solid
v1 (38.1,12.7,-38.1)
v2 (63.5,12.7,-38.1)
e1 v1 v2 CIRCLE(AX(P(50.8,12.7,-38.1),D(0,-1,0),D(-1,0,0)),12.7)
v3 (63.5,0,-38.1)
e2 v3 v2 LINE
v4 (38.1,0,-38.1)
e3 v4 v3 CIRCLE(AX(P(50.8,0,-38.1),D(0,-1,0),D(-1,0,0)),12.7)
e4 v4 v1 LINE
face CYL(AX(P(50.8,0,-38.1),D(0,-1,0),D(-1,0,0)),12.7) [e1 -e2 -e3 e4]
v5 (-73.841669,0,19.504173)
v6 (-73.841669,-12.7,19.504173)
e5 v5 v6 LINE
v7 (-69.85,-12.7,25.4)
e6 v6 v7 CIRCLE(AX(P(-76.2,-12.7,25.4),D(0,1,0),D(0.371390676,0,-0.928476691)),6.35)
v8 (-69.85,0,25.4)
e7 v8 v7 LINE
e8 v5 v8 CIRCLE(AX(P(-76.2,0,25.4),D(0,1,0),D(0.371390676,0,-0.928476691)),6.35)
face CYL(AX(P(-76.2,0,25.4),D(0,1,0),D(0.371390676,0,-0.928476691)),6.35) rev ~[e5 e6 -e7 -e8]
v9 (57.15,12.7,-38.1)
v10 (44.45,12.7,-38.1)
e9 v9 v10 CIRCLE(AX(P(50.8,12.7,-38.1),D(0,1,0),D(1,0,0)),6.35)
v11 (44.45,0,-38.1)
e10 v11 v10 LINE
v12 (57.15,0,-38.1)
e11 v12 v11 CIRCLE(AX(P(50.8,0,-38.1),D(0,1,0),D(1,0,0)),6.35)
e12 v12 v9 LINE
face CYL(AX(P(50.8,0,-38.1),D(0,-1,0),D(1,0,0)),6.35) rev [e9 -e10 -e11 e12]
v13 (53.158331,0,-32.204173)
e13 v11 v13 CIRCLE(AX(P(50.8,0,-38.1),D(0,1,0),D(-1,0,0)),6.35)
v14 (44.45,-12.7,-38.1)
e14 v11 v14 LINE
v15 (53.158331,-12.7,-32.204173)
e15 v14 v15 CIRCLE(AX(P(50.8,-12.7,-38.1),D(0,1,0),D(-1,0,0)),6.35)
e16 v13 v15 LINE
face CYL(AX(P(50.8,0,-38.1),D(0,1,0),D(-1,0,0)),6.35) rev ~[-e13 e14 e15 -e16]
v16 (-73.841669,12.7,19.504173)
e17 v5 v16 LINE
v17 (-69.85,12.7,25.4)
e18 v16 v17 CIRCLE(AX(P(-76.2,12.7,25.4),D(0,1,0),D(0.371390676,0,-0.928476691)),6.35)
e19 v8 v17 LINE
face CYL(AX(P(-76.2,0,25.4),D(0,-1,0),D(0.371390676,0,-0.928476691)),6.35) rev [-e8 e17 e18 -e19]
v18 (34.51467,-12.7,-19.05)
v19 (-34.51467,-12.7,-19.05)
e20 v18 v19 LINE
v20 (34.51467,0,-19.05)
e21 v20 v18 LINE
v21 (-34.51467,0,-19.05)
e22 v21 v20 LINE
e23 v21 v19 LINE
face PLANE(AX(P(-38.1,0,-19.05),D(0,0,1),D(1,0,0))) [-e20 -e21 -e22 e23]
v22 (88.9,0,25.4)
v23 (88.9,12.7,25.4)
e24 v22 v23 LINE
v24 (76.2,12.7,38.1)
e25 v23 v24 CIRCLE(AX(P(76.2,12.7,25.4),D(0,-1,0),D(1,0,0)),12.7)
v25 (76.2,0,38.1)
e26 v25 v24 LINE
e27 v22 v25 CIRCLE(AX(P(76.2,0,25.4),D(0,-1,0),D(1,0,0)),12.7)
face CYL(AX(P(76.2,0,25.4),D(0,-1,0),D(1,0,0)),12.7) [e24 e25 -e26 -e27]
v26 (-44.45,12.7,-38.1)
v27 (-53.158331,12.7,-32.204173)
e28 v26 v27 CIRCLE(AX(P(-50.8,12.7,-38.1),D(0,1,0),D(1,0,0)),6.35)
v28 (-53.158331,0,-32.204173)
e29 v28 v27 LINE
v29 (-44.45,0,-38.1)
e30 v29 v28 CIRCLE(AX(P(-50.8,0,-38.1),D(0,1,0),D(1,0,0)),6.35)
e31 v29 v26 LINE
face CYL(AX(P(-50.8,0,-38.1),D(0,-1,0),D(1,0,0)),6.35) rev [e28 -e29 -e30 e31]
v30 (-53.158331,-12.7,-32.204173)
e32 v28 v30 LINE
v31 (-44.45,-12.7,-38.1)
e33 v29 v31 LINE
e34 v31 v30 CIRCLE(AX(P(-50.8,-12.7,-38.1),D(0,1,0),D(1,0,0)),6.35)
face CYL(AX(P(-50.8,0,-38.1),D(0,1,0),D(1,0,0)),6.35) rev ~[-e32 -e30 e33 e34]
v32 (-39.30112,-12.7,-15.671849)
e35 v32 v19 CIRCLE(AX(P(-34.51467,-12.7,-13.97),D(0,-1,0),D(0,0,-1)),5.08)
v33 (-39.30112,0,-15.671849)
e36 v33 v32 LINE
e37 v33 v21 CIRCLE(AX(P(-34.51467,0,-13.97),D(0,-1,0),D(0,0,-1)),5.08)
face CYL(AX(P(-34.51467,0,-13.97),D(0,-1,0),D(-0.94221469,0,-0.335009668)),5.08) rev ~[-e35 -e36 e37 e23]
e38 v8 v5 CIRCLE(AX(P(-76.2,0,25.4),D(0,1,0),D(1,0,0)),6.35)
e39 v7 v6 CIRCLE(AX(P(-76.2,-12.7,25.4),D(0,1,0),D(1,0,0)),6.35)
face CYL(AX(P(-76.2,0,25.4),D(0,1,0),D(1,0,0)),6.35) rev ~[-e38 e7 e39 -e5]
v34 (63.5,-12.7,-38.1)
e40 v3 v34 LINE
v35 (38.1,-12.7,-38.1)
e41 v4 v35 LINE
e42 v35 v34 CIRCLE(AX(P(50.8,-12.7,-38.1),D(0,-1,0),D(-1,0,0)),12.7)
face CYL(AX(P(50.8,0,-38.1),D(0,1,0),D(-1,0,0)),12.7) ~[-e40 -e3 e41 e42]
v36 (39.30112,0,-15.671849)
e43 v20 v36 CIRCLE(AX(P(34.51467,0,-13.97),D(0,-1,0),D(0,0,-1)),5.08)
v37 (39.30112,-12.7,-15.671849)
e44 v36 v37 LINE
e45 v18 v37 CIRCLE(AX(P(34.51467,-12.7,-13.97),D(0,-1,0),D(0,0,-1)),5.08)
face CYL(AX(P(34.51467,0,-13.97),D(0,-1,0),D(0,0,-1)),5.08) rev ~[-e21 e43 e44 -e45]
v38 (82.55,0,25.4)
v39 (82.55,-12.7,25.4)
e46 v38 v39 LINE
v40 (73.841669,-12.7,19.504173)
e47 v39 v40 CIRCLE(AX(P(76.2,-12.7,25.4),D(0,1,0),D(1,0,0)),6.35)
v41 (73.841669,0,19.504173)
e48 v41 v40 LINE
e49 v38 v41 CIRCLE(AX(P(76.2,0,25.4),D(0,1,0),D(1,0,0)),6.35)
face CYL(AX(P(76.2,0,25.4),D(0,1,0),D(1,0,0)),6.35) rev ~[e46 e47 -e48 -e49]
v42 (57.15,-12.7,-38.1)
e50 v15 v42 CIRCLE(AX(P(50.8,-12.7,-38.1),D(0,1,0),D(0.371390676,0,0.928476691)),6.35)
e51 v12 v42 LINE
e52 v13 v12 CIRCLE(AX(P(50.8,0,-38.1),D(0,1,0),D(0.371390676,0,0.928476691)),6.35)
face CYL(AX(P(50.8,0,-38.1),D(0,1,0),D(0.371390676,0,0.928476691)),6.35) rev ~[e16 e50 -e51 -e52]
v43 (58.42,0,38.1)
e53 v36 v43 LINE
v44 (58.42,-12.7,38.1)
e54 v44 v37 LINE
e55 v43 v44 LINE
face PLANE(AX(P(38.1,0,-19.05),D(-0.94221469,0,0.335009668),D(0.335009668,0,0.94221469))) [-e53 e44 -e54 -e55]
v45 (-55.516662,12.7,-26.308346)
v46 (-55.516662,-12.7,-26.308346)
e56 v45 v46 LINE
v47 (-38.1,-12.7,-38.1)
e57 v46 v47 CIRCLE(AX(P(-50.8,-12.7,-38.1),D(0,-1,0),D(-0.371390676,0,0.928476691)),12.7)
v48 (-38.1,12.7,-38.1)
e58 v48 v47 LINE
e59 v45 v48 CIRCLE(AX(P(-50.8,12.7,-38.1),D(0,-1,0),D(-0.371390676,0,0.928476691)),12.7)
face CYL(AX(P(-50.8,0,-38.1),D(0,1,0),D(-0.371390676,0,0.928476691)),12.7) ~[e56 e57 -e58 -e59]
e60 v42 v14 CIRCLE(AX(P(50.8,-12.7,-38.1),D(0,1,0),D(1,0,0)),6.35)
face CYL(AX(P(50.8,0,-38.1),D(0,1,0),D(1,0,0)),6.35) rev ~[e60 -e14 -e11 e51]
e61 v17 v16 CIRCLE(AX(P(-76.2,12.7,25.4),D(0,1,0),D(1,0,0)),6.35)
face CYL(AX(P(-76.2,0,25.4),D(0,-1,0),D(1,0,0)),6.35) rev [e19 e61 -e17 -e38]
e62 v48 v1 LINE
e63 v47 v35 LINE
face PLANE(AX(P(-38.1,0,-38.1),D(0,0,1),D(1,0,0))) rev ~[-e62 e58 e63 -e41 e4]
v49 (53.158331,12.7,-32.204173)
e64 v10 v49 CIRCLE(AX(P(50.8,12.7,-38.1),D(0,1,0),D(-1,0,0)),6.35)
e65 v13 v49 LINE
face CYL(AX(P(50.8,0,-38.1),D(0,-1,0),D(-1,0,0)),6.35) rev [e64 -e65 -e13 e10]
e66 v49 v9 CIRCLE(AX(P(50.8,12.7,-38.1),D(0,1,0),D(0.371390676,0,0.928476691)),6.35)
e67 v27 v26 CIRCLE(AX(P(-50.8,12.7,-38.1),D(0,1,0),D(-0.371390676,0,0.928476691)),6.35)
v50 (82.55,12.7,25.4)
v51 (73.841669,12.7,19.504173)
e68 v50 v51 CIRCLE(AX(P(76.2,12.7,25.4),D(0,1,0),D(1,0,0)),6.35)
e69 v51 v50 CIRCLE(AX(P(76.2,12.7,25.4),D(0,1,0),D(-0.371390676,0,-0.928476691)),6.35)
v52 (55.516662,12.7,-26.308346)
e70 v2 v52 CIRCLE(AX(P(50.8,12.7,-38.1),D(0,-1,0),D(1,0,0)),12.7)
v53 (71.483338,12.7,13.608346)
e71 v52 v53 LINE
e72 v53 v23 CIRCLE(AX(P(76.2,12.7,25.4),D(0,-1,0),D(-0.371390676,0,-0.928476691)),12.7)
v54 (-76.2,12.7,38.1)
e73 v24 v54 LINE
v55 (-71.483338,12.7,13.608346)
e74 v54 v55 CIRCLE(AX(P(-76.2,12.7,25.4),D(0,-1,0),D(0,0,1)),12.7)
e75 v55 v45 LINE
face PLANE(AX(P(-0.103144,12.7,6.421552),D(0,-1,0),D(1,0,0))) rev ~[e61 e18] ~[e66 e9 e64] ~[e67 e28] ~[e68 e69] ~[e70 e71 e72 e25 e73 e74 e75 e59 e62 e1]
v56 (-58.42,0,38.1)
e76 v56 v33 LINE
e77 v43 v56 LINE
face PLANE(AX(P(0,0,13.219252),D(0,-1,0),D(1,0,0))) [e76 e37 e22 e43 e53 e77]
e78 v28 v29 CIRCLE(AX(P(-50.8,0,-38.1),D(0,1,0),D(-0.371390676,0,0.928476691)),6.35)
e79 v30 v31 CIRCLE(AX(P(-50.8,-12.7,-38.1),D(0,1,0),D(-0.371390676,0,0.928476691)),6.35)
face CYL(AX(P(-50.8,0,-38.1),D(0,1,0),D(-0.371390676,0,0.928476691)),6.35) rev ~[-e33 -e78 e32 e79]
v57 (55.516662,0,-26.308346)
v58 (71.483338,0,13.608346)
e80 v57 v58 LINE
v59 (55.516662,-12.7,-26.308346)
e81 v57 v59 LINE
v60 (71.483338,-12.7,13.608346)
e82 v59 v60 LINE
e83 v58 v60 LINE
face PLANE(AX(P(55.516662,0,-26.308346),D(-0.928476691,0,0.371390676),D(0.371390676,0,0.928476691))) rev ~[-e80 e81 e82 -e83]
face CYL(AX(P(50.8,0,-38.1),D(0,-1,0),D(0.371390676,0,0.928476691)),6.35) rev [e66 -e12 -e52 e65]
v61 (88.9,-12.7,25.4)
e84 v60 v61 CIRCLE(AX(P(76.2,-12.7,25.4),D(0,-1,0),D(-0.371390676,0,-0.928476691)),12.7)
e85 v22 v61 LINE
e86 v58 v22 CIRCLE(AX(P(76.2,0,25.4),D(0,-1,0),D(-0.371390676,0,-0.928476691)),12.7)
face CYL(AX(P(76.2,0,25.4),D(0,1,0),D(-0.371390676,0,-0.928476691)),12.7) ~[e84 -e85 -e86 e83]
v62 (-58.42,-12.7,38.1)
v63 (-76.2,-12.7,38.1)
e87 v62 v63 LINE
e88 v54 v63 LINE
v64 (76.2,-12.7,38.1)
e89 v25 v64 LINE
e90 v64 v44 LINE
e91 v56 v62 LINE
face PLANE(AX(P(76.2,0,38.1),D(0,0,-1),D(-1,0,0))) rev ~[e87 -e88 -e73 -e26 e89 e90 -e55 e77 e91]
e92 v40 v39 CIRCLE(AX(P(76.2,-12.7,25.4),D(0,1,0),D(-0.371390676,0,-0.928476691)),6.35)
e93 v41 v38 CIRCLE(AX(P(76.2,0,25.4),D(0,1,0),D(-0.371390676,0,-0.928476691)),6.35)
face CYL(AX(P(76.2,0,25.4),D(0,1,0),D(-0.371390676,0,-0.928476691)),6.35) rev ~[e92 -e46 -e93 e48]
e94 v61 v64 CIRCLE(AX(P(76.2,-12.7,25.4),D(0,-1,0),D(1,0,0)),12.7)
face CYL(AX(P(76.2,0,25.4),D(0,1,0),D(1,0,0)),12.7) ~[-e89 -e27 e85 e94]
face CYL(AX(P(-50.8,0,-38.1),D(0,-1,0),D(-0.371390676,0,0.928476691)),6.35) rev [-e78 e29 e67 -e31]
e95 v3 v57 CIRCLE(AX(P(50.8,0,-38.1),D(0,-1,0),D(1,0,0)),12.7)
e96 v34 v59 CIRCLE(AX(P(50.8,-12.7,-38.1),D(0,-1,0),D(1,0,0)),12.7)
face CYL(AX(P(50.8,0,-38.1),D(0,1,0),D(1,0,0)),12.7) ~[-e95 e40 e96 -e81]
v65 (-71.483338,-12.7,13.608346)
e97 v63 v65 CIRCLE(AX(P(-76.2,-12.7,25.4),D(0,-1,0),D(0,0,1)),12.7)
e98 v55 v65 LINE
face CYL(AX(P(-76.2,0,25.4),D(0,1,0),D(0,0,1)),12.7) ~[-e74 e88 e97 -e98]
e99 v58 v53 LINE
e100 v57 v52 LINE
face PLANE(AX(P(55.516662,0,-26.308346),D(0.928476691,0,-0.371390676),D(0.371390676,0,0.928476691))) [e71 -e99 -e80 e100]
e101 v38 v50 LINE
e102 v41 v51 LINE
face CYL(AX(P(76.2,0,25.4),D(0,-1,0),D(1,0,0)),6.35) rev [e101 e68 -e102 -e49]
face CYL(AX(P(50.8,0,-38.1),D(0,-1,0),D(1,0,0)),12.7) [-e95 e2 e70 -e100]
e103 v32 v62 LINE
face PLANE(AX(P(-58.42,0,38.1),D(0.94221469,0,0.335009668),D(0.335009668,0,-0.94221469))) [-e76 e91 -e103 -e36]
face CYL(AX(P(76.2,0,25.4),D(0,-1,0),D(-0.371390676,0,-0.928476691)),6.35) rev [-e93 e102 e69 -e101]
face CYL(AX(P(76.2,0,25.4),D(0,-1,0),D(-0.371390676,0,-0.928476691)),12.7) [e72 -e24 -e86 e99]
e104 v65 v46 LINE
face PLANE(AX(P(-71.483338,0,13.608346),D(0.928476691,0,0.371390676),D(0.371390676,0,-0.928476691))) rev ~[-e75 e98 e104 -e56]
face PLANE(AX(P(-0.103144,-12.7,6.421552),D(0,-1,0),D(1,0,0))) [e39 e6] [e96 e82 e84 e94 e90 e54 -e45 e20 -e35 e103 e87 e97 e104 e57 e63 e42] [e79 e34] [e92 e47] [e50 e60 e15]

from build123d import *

# Parameters (mm, degrees)
F1_DEPTH = 12.7
F3_DEPTH = 38.1
F4_R     = 5.08


# Not quite as in the source:
# - a feature of the source that left no trace in its solid (it failed there, or was rolled back) is left out


with BuildPart() as f1:
    # F0 (on Front) → F1 (new body, symmetric)
    with BuildSketch(Plane.XZ):
        with BuildLine():
            Line((-38.1, -38.1), (0, -38.1))
            Line((0, -38.1), (38.1, -38.1))
            ThreePointArc((38.1, -38.1), (43.6800141218, -27.583546173), (55.5166615897, -26.3083460258))
            Line((55.5166615897, -26.3083460258), (71.4833384103, 13.6083460258))
            ThreePointArc((71.4833384103, 13.6083460258), (63.7291538885, 27.8016655187), (76.2, 38.1))
            Line((76.2, 38.1), (0, 38.1))
            Line((0, 38.1), (-76.2, 38.1))
            ThreePointArc((-76.2, 38.1), (-67.2197438789, 34.3802561211), (-63.5, 25.4))
            ThreePointArc((-63.5, 25.4), (-65.683546173, 18.2800141218), (-71.4833384103, 13.6083460258))
            Line((-71.4833384103, 13.6083460258), (-55.5166615897, -26.3083460258))
            ThreePointArc((-55.5166615897, -26.3083460258), (-43.6800141218, -27.583546173), (-38.1, -38.1))
        make_face()
        with BuildLine():
            ThreePointArc((55.5166615897, -26.3083460258), (43.6800141218, -27.583546173), (38.1, -38.1))
            Line((38.1, -38.1), (44.45, -38.1))
            ThreePointArc((44.45, -38.1), (47.2400070609, -32.8417730865), (53.1583307948, -32.2041730129))
            Line((53.1583307948, -32.2041730129), (55.5166615897, -26.3083460258))
        make_face()
        with BuildLine():
            Line((-44.45, -38.1), (-38.1, -38.1))
            ThreePointArc((-38.1, -38.1), (-43.6800141218, -27.583546173), (-55.5166615897, -26.3083460258))
            Line((-55.5166615897, -26.3083460258), (-53.1583307948, -32.2041730129))
            ThreePointArc((-53.1583307948, -32.2041730129), (-47.2400070609, -32.8417730865), (-44.45, -38.1))
        make_face()
        with BuildLine():
            ThreePointArc((-76.2, 38.1), (-88.6708461115, 22.9983344813), (-71.4833384103, 13.6083460258))
            ThreePointArc((-71.4833384103, 13.6083460258), (-65.683546173, 18.2800141218), (-63.5, 25.4))
            ThreePointArc((-63.5, 25.4), (-67.2197438789, 34.3802561211), (-76.2, 38.1))
        make_face()
        with BuildLine():
            ThreePointArc((-69.85, 25.4), (-70.9417730865, 21.8400070609), (-73.8416692052, 19.5041730129))
            ThreePointArc((-73.8416692052, 19.5041730129), (-81.4582269135, 28.9599929391), (-69.85, 25.4))
        make_face(mode=Mode.SUBTRACT)
        with BuildLine():
            ThreePointArc((76.2, 38.1), (63.7291538885, 27.8016655187), (71.4833384103, 13.6083460258))
            ThreePointArc((71.4833384103, 13.6083460258), (83.3199858782, 14.883546173), (88.9, 25.4))
            ThreePointArc((88.9, 25.4), (85.1802561211, 34.3802561211), (76.2, 38.1))
        make_face()
        with BuildLine():
            ThreePointArc((82.55, 25.4), (79.7599929391, 20.1417730865), (73.8416692052, 19.5041730129))
            ThreePointArc((73.8416692052, 19.5041730129), (72.6400070609, 30.6582269135), (82.55, 25.4))
        make_face(mode=Mode.SUBTRACT)
        with BuildLine():
            ThreePointArc((-55.5166615897, -26.3083460258), (-57.9199858782, -48.616453827), (-38.1, -38.1))
            Line((-38.1, -38.1), (-44.45, -38.1))
            ThreePointArc((-44.45, -38.1), (-54.3599929391, -43.3582269135), (-53.1583307948, -32.2041730129))
            Line((-53.1583307948, -32.2041730129), (-55.5166615897, -26.3083460258))
        make_face()
        with BuildLine():
            Line((44.45, -38.1), (38.1, -38.1))
            ThreePointArc((38.1, -38.1), (50.8, -50.8), (63.5, -38.1))
            ThreePointArc((63.5, -38.1), (61.316453827, -30.9800141218), (55.5166615897, -26.3083460258))
            Line((55.5166615897, -26.3083460258), (53.1583307948, -32.2041730129))
            ThreePointArc((53.1583307948, -32.2041730129), (56.0582269135, -34.5400070609), (57.15, -38.1))
            ThreePointArc((57.15, -38.1), (50.8, -44.45), (44.45, -38.1))
        make_face()
    extrude(amount=F1_DEPTH, both=True)

    # F2 (on Front) → F3 (cut)
    with BuildSketch(Plane.XZ):
        Polygon((-38.1, -19.05), (0, -19.05), (38.1, -19.05), (58.42, 38.1), (0, 38.1), (-58.42, 38.1), align=None)
    extrude(amount=F3_DEPTH, mode=Mode.SUBTRACT)

    # F4
    f4_edges = [f1.edges().sort_by_distance(p)[0] for p in [
        (-38.1, -6.35, -19.05),
        (38.1, -6.35, -19.05),
    ]]
    fillet(f4_edges, radius=F4_R)


solid = f1.part
